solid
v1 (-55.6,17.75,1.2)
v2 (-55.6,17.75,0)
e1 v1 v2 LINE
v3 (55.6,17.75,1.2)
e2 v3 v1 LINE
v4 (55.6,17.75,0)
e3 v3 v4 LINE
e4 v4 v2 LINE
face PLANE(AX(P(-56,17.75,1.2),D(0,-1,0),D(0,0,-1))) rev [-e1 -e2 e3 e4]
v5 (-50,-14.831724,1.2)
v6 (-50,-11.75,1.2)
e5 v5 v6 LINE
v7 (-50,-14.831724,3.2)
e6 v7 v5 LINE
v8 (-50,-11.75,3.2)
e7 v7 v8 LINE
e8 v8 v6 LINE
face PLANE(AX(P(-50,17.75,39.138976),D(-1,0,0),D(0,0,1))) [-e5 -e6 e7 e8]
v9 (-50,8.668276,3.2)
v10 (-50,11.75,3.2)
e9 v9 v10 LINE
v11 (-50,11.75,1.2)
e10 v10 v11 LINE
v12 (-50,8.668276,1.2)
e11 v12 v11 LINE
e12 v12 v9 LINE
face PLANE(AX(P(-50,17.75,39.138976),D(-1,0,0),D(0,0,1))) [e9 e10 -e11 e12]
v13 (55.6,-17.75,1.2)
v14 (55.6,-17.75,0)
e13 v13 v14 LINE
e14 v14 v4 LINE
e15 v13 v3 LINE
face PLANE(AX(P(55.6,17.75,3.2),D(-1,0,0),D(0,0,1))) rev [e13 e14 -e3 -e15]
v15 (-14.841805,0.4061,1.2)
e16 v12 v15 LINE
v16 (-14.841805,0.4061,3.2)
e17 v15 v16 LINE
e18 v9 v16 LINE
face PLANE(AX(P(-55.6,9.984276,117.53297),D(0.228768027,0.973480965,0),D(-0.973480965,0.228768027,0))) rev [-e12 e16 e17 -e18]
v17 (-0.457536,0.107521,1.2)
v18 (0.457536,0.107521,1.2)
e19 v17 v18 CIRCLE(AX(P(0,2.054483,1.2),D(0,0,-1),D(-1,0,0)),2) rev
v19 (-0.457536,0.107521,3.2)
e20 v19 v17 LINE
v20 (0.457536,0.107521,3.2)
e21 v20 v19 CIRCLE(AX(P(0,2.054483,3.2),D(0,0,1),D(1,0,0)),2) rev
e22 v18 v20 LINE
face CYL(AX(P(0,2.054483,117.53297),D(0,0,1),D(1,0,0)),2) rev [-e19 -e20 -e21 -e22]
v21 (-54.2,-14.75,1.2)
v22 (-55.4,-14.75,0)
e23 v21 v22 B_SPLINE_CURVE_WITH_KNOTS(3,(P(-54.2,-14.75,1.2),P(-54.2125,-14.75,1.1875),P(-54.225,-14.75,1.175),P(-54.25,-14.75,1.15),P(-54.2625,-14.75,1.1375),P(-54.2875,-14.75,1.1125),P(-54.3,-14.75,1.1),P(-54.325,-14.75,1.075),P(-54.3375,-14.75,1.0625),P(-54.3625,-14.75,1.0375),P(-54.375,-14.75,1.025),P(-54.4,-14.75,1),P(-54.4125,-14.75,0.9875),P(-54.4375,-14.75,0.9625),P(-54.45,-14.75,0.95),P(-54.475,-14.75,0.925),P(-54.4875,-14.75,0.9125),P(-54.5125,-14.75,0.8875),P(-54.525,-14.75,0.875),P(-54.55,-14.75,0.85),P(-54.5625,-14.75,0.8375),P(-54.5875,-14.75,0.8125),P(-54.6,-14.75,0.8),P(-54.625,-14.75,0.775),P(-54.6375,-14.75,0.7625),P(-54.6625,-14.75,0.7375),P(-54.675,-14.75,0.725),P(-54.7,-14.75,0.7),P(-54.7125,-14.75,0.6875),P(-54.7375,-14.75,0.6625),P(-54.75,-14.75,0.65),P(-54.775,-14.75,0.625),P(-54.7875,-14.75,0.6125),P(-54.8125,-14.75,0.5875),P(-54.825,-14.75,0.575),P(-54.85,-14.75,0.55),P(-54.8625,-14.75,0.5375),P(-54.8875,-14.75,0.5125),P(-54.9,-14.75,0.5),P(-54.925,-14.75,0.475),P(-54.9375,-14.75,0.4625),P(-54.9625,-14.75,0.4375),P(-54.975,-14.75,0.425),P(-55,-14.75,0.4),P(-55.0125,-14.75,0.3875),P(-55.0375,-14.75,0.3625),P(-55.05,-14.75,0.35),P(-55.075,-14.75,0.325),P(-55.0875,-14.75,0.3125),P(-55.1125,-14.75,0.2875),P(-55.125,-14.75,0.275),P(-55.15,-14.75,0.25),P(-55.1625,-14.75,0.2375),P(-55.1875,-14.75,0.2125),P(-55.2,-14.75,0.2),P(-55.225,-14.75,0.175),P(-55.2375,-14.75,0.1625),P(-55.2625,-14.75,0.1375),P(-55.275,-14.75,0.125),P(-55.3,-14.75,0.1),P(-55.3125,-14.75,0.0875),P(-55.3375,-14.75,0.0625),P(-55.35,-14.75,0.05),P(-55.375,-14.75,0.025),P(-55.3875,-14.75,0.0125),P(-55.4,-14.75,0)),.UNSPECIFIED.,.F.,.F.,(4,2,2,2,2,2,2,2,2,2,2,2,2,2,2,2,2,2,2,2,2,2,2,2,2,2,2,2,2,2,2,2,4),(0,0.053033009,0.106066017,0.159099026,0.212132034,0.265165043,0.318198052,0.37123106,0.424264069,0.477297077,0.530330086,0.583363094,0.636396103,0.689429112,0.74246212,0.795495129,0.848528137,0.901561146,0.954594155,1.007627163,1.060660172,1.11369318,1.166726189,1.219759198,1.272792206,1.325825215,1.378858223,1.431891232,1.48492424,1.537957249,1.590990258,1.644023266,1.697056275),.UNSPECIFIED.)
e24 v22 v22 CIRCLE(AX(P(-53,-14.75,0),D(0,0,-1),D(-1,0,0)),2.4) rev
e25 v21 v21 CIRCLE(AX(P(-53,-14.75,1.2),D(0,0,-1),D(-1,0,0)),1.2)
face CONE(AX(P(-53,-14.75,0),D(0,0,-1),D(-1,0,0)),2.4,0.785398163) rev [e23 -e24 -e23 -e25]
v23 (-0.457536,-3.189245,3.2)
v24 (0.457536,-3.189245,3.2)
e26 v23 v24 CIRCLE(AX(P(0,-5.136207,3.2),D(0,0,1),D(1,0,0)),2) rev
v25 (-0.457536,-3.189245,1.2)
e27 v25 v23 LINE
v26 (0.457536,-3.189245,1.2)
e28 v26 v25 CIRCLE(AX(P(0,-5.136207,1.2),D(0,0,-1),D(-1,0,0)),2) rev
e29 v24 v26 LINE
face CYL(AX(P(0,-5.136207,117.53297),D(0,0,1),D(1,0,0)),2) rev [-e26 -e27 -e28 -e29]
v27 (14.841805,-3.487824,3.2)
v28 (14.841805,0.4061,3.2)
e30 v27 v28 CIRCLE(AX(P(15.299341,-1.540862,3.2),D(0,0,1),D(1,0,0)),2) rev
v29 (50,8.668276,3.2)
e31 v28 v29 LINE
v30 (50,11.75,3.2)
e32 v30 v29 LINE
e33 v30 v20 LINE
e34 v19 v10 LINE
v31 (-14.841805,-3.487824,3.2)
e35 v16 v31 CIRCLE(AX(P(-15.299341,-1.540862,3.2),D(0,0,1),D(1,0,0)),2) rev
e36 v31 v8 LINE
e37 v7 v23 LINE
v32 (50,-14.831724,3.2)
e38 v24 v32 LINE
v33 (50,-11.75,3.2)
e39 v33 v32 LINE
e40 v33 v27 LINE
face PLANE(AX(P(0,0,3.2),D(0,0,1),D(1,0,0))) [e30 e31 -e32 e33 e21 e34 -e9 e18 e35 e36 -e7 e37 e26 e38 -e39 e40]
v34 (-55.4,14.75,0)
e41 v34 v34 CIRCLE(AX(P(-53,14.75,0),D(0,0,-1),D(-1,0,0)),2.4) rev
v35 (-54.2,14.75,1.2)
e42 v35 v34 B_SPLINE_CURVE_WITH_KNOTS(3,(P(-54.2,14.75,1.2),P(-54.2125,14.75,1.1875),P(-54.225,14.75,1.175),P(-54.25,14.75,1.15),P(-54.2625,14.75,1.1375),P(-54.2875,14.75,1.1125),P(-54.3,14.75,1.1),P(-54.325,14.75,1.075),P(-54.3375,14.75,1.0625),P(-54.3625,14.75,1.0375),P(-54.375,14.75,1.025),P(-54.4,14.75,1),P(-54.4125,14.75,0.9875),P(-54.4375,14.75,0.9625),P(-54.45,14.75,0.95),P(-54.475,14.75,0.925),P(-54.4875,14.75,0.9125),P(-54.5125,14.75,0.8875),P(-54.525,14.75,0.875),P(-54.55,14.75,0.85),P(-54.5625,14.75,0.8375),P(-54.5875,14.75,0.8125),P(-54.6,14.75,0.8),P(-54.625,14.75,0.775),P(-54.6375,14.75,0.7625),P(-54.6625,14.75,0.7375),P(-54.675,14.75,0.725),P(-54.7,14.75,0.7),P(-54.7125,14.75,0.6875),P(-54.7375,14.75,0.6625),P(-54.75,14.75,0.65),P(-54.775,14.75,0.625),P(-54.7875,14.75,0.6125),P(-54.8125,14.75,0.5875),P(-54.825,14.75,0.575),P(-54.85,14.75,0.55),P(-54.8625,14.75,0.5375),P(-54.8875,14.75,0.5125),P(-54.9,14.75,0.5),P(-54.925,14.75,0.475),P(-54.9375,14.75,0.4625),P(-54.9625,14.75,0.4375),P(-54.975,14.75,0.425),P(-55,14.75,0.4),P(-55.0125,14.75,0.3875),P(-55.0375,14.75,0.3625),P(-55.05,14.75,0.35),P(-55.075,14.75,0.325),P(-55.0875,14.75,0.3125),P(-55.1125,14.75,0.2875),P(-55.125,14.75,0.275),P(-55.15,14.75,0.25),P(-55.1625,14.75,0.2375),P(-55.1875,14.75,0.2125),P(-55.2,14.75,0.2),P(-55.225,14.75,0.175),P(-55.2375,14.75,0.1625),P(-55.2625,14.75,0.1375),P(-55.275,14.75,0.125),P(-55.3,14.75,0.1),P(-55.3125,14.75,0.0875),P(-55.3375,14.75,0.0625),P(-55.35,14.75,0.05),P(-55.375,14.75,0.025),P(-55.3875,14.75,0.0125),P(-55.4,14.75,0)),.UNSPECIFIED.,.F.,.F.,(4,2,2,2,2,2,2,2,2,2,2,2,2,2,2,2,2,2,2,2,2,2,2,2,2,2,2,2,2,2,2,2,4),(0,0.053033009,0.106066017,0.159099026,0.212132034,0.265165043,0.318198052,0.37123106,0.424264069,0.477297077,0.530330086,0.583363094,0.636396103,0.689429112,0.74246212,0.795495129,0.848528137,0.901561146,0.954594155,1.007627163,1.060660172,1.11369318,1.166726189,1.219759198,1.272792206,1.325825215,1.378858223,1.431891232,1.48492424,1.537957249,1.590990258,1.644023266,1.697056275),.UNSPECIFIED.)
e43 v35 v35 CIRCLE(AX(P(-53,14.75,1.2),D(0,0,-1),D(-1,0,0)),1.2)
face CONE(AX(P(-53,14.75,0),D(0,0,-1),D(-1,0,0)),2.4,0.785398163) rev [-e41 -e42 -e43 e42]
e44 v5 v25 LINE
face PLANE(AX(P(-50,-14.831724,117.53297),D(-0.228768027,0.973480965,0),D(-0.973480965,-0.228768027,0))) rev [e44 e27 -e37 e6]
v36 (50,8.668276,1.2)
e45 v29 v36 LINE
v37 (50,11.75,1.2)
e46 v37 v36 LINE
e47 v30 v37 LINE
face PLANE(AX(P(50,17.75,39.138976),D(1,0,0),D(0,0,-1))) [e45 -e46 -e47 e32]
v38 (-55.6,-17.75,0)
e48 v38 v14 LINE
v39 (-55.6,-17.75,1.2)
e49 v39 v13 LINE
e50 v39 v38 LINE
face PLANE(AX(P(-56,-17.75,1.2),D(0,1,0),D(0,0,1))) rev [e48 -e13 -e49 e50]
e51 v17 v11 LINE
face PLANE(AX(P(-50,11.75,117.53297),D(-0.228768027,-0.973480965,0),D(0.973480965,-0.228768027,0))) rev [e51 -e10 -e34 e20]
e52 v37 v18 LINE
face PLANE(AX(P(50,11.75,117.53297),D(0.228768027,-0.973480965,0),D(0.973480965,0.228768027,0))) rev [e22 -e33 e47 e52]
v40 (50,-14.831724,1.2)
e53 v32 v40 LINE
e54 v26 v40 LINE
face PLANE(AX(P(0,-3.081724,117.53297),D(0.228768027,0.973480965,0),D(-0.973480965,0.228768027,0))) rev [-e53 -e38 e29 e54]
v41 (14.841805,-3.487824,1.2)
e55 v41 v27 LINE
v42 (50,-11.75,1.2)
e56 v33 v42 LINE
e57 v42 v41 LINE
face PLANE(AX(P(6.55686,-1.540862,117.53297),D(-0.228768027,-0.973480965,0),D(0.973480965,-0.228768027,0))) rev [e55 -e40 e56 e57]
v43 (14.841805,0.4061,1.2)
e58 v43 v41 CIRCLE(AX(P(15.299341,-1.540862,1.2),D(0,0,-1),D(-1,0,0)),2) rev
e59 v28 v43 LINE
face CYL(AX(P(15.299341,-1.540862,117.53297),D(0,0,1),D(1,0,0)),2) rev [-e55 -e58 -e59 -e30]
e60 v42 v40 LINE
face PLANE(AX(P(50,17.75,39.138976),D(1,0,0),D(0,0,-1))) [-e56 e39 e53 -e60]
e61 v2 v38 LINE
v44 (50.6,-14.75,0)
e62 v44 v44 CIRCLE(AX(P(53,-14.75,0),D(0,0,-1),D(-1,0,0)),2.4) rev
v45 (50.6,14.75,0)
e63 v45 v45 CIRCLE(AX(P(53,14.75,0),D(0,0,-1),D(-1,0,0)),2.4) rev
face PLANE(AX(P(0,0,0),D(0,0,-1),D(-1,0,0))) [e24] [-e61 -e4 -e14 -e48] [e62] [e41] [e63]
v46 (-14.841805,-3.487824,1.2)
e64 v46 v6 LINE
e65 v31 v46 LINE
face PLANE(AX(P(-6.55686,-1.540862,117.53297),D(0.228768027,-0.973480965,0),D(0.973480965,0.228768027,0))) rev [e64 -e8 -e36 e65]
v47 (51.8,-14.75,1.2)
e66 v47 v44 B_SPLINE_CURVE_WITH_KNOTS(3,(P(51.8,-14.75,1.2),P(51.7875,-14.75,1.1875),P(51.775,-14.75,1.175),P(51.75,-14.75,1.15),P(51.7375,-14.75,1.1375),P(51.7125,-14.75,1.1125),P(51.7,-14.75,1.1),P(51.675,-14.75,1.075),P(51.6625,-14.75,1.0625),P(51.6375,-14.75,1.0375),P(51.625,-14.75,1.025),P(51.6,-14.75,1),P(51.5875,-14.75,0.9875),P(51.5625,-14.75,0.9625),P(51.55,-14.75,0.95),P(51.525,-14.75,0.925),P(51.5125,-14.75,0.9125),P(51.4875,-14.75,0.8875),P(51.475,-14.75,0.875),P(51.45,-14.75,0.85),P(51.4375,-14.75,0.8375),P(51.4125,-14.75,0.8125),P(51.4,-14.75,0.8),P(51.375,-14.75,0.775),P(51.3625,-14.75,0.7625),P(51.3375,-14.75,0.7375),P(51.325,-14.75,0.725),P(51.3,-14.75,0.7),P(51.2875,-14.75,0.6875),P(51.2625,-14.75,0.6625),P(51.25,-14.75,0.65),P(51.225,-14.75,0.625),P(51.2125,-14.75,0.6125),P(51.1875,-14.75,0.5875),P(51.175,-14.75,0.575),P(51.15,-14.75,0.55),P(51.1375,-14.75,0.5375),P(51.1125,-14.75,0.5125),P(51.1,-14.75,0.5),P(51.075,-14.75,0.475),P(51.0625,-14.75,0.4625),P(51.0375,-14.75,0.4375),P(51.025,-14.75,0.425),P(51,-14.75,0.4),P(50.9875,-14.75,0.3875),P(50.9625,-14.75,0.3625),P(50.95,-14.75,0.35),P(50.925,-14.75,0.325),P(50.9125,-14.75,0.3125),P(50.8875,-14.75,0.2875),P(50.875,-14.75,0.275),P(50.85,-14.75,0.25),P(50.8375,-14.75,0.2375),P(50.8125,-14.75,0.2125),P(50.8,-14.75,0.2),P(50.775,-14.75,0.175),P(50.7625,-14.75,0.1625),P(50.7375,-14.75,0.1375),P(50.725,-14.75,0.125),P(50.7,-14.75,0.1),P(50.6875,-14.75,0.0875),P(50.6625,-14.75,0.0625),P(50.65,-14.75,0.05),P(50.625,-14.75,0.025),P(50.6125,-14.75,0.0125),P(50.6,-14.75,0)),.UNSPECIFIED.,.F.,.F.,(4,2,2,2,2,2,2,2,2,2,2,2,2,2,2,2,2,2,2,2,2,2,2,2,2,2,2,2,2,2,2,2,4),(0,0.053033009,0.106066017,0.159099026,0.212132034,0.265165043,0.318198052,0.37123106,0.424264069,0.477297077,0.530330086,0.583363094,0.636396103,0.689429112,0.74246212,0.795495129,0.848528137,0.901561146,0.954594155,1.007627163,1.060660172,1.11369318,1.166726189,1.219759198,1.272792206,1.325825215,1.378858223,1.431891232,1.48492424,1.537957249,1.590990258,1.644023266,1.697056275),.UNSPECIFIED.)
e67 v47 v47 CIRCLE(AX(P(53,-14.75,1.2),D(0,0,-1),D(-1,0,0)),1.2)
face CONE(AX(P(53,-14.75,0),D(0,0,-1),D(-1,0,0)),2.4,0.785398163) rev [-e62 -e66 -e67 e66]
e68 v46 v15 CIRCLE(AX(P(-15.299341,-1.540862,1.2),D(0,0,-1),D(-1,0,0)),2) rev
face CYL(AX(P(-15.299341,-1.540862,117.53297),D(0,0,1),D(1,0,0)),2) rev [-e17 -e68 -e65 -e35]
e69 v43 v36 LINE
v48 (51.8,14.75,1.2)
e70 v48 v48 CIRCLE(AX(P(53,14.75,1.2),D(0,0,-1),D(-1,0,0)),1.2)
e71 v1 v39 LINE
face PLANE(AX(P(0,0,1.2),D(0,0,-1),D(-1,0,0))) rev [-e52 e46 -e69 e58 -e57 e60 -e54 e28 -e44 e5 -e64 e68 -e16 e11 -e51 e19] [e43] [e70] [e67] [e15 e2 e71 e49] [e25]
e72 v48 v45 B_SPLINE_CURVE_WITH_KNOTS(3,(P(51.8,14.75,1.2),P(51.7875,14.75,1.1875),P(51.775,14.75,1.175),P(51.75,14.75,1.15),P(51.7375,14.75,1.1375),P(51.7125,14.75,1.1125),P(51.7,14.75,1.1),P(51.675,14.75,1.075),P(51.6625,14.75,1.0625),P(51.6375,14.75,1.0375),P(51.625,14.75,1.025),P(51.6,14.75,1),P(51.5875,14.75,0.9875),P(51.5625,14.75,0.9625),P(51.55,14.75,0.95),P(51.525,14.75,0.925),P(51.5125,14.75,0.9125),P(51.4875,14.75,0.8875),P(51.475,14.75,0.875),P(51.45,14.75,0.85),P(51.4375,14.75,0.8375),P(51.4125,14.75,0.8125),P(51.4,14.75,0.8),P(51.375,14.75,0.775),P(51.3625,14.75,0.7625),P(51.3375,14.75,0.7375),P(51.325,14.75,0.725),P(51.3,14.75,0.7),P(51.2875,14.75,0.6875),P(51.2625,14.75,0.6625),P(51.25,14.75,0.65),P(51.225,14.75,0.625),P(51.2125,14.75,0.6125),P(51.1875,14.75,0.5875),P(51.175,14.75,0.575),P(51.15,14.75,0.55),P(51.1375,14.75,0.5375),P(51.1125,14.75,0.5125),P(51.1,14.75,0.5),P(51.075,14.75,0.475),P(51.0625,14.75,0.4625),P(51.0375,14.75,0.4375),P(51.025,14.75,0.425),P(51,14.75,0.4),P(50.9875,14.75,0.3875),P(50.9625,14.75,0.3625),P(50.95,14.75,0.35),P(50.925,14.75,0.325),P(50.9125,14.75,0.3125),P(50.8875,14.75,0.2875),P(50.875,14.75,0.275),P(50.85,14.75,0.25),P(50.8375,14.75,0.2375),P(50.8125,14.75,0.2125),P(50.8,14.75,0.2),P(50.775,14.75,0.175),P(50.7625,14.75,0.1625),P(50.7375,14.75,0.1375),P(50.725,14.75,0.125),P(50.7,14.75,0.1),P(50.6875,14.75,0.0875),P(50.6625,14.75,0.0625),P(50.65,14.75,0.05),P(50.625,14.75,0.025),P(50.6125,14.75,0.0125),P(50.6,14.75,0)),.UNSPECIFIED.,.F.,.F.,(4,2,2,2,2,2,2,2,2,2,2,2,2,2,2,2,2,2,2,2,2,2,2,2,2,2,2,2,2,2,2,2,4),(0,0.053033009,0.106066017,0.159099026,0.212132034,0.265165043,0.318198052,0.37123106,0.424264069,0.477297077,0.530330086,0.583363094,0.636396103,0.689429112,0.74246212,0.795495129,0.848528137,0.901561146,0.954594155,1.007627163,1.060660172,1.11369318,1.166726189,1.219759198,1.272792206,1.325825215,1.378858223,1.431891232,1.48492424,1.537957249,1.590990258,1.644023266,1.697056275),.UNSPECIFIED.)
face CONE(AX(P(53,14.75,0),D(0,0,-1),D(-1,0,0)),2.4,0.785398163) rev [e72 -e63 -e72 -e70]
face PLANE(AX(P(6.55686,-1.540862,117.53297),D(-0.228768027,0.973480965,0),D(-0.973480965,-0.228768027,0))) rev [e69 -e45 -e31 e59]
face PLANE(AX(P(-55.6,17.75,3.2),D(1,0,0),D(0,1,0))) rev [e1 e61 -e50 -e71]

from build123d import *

# Parameters (mm, degrees)
SKETCH1_W                       = 112
SKETCH1_H                       = 35.5
BOSS_EXTRUDE1_DEPTH             = 1.2
SKETCH2_W                       = 6
SKETCH2_H                       = 6
BOSS_EXTRUDE2_DEPTH             = 2
SKETCH3_R                       = 1.1
CUT_EXTRUDE1_DEPTH              = 59.83283522
SKETCH7_W                       = 0.4
SKETCH7_H                       = 35.5
CUT_EXTRUDE5_DEPTH              = 59.83283522
AUFSATZ_LINEAR_AUSTRAGEN2_DEPTH = 2
VERRUNDUNG1_R                   = 2
SKETCH8_W                       = 5.6
SKETCH8_H                       = 35.5
CUT_EXTRUDE7_DEPTH              = 2
CHAMFER1_SIZE                   = 1.3


with BuildPart() as part:
    # Sketch1 → Boss-Extrude1 (new body)
    with BuildSketch(Plane.XY):
        Rectangle(SKETCH1_W, SKETCH1_H)
    extrude(amount=BOSS_EXTRUDE1_DEPTH)

    # Sketch2 → Boss-Extrude2 (add)
    with BuildSketch(Plane.XY.offset(1.2)):
        with Locations((-53, 14.75)):
            Rectangle(SKETCH2_W, SKETCH2_H)
        with Locations((-53, -14.75)):
            Rectangle(SKETCH2_W, SKETCH2_H)
        with Locations((53, -14.75)):
            Rectangle(SKETCH2_W, SKETCH2_H)
        with Locations((53, 14.75)):
            Rectangle(SKETCH2_W, SKETCH2_H)
    extrude(amount=BOSS_EXTRUDE2_DEPTH)

    # Sketch3 → Cut-Extrude1 (cut, through all)
    with BuildSketch(Plane.XY.offset(3.2)):
        with Locations((-53, 14.75)):
            Circle(SKETCH3_R)
        with Locations((-53, -14.75)):
            Circle(SKETCH3_R)
        with Locations((53, -14.75)):
            Circle(SKETCH3_R)
        with Locations((53, 14.75)):
            Circle(SKETCH3_R)
    extrude(amount=-CUT_EXTRUDE1_DEPTH, mode=Mode.SUBTRACT)

    # Sketch7 → Cut-Extrude5 (cut, through all)
    with BuildSketch(Plane(origin=(0, 0, 0), x_dir=(-1, 0, 0), z_dir=(0, 0, -1))):
        with Locations((-55.8, 0)):
            Rectangle(SKETCH7_W, SKETCH7_H)
        with Locations((55.8, 0)):
            Rectangle(SKETCH7_W, SKETCH7_H)
    extrude(amount=-CUT_EXTRUDE5_DEPTH, mode=Mode.SUBTRACT)

    # Skizze5 → Aufsatz-Linear austragen2 (add)
    with BuildSketch(Plane.XY.offset(1.2)):
        Polygon((-50, 11.75), (0, 0), (50, 11.75), (55.6, 11.75), (55.6, 9.984275645), (6.55686033, -1.540862177), (50, -11.75), (50, -14.831724355), (0, -3.081724355), (-50, -14.831724355), (-50, -11.75), (-6.55686033, -1.540862177), (-55.6, 9.984275645), (-55.6, 11.75), align=None)
    extrude(amount=AUFSATZ_LINEAR_AUSTRAGEN2_DEPTH)

    # Verrundung1
    verrundung1_edges = [part.edges().sort_by_distance(p)[0] for p in [
        (-6.55686033, -1.540862177, 2.2),
        (0, -3.081724355, 2.2),
        (6.55686033, -1.540862177, 2.2),
        (0, 0, 2.2),
    ]]
    fillet(verrundung1_edges, radius=VERRUNDUNG1_R)

    # Sketch8 → Cut-Extrude7 (cut)
    with BuildSketch(Plane.XY.offset(1.2)):
        with Locations((-52.8, 0)):
            Rectangle(SKETCH8_W, SKETCH8_H)
        with Locations((52.8, 0)):
            Rectangle(SKETCH8_W, SKETCH8_H)
    extrude(amount=CUT_EXTRUDE7_DEPTH, mode=Mode.SUBTRACT)

    # Chamfer1
    # the kernel refuses this chamfer: 1.3 mm, written as the material it takes off along each edge
    with BuildSketch(Plane(origin=(53, 14.75, 0), x_dir=(1, 0, 0), z_dir=(0, -1, 0))) as chamfer1_piece_1:
        Polygon((1.1, CHAMFER1_SIZE), (1.1 + CHAMFER1_SIZE, 0), (1.1, 0), align=None)
    revolve(axis=Axis((53, 14.75, 0), (0, 0, 1)), mode=Mode.SUBTRACT)
    with BuildSketch(Plane(origin=(-53, -14.75, 0), x_dir=(1, 0, 0), z_dir=(0, -1, 0))) as chamfer1_piece_2:
        Polygon((1.1 + CHAMFER1_SIZE, 0), (1.1, CHAMFER1_SIZE), (1.1, 0), align=None)
    revolve(axis=Axis((-53, -14.75, 0), (0, 0, 1)), mode=Mode.SUBTRACT)
    with BuildSketch(Plane(origin=(-53, 14.75, 0), x_dir=(1, 0, 0), z_dir=(0, -1, 0))) as chamfer1_piece_3:
        Polygon((1.1 + CHAMFER1_SIZE, 0), (1.1, CHAMFER1_SIZE), (1.1, 0), align=None)
    revolve(axis=Axis((-53, 14.75, 0), (0, 0, 1)), mode=Mode.SUBTRACT)
    with BuildSketch(Plane(origin=(53, -14.75, 0), x_dir=(1, 0, 0), z_dir=(0, -1, 0))) as chamfer1_piece_4:
        Polygon((1.1 + CHAMFER1_SIZE, 0), (1.1, CHAMFER1_SIZE), (1.1, 0), align=None)
    revolve(axis=Axis((53, -14.75, 0), (0, 0, 1)), mode=Mode.SUBTRACT)


solid = part.part
